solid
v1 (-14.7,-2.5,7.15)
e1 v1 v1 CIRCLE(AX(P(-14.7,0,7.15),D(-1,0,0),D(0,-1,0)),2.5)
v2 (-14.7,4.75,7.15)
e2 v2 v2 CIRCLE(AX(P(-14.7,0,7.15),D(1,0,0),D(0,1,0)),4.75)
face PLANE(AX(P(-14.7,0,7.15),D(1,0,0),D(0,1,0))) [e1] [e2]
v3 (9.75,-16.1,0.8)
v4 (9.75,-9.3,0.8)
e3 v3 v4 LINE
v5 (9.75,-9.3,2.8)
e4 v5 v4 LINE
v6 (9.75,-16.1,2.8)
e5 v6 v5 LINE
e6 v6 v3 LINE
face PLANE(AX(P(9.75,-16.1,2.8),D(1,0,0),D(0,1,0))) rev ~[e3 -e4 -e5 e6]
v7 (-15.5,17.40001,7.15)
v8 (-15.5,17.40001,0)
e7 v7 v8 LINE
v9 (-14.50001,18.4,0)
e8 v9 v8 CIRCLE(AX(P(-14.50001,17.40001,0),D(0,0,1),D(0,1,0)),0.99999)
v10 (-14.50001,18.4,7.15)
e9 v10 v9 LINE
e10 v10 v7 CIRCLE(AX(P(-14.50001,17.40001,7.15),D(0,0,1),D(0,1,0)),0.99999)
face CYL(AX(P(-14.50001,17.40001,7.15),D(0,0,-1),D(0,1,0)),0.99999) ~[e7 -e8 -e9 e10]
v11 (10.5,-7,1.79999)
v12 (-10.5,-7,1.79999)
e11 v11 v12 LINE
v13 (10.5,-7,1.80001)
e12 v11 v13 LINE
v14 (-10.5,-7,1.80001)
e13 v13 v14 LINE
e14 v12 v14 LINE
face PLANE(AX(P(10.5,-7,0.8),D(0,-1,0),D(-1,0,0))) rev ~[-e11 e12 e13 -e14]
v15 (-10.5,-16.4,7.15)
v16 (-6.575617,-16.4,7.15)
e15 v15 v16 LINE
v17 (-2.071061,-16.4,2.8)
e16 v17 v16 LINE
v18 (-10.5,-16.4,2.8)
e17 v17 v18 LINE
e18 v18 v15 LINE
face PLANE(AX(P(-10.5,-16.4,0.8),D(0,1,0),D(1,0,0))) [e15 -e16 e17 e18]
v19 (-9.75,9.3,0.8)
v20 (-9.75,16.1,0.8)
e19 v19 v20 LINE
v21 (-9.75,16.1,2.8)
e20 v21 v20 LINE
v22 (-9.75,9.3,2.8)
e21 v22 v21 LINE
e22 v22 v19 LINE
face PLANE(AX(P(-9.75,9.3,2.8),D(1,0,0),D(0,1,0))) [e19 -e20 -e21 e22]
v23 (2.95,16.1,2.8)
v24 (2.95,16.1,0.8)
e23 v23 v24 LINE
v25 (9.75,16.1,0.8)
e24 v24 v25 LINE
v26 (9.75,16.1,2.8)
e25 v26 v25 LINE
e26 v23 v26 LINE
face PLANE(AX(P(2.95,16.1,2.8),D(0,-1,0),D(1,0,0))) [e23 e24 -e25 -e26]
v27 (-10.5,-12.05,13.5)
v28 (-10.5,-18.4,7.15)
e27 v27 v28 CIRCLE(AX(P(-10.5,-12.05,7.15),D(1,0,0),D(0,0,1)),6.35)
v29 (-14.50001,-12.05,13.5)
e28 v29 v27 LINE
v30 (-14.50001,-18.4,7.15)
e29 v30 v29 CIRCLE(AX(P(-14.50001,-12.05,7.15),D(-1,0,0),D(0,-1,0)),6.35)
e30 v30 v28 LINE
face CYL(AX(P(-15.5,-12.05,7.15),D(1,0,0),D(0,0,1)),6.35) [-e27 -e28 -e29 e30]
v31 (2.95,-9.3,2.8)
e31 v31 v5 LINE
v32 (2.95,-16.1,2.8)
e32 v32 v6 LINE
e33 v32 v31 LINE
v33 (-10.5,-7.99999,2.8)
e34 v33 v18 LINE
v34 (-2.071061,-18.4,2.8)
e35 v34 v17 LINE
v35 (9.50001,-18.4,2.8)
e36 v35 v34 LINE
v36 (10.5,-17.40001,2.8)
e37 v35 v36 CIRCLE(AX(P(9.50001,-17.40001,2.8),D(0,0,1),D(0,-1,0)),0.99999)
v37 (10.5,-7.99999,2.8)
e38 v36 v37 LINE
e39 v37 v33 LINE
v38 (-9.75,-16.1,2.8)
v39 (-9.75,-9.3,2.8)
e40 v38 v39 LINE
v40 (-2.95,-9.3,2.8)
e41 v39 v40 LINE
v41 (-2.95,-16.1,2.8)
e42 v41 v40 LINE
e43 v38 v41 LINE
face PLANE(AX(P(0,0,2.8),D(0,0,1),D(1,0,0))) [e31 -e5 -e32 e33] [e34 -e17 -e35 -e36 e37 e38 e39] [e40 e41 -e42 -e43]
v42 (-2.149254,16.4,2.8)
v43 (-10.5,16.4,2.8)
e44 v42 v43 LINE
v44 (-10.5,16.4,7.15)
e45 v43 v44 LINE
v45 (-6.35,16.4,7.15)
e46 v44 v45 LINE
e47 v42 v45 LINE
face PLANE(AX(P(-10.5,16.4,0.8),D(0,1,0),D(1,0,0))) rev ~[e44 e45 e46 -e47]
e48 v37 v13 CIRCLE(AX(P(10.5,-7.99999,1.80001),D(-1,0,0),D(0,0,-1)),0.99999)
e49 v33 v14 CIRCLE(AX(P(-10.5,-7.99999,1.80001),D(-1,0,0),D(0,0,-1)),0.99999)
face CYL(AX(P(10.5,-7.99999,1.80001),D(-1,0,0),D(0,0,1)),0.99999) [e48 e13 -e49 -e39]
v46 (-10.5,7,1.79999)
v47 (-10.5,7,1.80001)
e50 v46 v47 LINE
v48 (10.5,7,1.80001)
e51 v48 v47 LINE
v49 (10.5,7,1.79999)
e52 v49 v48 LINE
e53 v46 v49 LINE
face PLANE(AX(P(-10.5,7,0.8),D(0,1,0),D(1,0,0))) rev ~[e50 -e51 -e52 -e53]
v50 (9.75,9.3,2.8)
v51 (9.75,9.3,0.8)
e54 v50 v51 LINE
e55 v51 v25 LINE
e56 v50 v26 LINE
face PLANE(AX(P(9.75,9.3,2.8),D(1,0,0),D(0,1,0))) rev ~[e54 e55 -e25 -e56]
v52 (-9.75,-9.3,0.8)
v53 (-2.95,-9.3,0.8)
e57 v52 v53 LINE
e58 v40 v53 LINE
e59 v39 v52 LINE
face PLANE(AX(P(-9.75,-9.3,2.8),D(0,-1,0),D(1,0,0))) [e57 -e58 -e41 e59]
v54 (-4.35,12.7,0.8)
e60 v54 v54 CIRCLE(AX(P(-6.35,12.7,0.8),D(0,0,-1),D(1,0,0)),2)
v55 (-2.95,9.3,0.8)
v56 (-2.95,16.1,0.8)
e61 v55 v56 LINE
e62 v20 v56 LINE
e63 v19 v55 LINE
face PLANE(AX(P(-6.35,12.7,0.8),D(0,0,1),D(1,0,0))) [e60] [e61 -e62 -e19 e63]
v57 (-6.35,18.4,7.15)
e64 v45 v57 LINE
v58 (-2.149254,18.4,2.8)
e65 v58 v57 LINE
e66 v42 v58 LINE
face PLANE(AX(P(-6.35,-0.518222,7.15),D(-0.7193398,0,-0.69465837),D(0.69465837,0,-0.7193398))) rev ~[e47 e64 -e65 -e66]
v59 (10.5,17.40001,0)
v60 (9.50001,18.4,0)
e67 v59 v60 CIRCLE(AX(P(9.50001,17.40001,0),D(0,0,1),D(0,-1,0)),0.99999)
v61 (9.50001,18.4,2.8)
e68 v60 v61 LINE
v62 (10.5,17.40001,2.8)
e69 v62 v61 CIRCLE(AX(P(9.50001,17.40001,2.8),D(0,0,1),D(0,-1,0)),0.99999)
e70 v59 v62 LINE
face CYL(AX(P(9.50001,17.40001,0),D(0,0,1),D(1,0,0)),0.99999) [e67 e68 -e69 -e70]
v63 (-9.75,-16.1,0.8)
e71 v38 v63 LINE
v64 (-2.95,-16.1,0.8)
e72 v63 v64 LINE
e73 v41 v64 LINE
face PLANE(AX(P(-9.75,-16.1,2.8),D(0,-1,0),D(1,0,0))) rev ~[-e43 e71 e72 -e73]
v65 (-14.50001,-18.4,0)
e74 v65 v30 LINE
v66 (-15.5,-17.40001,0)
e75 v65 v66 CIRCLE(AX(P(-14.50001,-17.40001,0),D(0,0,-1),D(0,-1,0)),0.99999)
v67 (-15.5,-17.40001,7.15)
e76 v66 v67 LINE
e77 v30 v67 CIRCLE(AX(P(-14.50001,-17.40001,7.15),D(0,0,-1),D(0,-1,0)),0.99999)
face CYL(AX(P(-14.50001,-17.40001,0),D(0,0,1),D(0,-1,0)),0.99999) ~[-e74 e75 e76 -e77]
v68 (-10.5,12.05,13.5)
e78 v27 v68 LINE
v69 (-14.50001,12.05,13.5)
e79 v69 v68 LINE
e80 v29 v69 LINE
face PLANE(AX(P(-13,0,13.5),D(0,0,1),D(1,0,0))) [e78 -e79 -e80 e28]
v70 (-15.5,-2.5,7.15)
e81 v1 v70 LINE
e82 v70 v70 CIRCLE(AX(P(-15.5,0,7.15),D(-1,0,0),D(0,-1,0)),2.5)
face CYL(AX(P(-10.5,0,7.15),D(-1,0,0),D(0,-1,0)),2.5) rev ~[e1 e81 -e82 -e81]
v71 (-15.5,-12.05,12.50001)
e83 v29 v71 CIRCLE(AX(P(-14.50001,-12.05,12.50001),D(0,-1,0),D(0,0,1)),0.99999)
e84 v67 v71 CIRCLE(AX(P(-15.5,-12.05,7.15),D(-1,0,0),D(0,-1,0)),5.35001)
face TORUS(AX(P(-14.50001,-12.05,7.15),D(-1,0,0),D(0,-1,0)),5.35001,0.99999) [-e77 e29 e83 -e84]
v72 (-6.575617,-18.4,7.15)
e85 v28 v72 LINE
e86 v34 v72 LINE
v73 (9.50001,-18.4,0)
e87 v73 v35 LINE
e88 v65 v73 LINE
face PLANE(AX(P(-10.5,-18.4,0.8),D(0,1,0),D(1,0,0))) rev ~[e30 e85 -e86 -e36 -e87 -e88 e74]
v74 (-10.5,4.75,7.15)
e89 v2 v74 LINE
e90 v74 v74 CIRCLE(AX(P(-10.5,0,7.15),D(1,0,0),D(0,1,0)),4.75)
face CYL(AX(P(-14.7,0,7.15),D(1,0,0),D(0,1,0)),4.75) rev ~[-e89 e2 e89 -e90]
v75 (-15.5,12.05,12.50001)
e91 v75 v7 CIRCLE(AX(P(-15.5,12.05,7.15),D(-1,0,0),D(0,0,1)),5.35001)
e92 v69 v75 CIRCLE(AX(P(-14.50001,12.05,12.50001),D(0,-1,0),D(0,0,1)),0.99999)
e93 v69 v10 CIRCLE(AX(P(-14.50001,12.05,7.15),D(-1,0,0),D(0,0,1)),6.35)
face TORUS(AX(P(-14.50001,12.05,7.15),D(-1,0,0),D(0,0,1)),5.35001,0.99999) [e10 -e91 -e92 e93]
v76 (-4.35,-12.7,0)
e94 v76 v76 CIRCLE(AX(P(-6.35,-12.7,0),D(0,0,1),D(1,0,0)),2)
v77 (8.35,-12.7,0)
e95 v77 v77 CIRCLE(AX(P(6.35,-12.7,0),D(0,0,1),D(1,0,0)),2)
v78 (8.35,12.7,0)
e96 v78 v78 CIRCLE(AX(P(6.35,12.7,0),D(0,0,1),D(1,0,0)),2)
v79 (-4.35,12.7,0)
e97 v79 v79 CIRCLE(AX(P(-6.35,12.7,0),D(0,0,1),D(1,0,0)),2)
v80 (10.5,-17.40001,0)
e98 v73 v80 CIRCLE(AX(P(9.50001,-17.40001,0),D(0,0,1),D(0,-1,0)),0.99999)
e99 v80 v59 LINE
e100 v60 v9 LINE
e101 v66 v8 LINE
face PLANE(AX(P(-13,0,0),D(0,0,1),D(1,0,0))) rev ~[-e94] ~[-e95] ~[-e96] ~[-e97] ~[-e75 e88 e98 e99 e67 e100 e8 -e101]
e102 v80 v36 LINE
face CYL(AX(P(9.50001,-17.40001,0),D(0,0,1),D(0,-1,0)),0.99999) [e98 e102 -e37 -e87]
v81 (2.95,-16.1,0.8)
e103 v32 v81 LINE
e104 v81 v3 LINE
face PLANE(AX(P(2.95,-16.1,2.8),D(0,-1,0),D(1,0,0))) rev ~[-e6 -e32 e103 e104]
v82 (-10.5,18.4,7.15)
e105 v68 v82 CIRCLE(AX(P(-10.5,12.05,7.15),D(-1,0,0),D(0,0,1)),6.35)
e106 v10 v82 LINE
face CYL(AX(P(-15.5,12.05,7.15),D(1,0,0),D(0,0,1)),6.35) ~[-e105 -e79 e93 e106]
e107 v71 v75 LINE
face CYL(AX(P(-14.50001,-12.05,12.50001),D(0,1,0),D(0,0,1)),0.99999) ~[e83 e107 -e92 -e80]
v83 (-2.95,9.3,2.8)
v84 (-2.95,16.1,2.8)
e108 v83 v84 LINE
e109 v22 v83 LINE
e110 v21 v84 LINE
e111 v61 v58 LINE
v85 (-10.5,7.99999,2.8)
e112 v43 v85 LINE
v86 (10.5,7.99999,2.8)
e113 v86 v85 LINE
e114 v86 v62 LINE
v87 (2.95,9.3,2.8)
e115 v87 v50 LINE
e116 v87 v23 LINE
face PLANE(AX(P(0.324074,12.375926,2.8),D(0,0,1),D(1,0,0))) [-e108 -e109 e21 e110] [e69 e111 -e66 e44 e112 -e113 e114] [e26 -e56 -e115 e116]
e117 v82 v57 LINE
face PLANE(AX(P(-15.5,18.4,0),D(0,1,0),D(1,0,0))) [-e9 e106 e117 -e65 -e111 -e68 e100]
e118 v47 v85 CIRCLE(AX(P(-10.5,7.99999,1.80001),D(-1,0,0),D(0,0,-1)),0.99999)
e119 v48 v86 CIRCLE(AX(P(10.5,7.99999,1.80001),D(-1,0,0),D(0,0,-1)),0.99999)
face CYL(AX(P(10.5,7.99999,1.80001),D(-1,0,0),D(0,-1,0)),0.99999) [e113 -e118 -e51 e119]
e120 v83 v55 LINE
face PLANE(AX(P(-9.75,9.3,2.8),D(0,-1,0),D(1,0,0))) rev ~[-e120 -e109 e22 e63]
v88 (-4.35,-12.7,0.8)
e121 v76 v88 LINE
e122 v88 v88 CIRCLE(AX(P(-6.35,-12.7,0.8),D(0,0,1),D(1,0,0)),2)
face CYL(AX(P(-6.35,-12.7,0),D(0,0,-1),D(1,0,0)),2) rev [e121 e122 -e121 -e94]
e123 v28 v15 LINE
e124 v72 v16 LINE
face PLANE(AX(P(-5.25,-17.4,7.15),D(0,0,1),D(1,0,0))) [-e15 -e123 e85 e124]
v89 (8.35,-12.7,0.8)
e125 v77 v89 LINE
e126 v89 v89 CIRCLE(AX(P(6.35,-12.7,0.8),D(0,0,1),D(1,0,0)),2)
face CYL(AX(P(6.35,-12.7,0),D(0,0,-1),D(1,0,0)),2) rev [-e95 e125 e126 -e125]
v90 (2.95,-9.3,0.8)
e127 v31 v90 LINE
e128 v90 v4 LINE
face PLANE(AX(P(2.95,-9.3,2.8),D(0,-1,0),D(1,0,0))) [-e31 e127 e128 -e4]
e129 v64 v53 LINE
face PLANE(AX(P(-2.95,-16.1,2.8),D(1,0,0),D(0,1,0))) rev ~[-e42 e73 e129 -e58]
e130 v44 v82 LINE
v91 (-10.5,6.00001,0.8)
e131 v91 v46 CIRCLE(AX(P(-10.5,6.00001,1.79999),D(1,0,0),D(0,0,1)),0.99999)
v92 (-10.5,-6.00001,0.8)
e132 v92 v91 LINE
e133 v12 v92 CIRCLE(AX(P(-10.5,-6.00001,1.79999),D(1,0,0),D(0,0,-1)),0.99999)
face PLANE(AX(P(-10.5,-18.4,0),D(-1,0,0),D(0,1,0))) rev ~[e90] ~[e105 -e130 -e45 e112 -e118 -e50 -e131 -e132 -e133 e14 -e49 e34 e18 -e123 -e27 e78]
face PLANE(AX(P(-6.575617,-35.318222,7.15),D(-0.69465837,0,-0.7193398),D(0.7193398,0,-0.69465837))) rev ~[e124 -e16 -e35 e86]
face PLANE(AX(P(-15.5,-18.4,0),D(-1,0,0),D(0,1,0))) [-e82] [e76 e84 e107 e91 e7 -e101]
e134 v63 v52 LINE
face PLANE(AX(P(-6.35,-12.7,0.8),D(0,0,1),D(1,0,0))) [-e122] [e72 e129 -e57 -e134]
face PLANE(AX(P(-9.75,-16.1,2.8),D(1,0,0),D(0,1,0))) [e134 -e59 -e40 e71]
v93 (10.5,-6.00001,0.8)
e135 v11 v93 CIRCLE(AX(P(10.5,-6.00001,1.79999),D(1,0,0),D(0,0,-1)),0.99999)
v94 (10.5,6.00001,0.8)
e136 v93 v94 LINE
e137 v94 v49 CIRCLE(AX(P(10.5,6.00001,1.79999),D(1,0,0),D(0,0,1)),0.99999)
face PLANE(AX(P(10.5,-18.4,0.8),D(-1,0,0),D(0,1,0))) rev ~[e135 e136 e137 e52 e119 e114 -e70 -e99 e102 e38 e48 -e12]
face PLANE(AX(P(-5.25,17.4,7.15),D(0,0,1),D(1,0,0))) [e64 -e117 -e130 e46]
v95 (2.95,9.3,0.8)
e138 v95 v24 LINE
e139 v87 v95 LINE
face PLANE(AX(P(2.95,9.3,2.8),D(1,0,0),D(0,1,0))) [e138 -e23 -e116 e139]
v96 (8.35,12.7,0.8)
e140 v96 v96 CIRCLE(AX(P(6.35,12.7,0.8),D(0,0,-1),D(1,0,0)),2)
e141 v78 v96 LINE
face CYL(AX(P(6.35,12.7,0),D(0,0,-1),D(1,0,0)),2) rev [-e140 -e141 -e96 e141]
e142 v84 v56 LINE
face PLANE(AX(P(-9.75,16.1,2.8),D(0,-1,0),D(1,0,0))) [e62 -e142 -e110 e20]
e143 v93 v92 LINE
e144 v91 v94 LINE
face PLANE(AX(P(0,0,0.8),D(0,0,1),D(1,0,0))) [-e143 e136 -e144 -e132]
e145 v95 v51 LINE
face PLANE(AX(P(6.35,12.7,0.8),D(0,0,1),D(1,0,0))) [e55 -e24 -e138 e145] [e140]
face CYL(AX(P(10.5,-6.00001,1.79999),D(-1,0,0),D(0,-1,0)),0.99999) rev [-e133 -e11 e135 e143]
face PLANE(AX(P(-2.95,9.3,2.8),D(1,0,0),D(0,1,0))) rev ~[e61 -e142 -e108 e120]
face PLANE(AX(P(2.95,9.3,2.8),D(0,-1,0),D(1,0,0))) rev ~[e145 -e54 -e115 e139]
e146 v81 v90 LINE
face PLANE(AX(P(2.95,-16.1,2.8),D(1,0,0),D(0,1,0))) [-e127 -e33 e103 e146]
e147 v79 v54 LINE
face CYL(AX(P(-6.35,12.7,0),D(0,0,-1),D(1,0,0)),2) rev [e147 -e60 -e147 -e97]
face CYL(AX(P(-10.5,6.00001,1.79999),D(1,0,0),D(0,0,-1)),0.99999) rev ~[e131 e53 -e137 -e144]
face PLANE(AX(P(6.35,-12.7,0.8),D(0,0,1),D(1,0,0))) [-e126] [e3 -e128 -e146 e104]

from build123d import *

# Parameters (mm, degrees)
F0_W           = 21
F0_H           = 36.8
F0_R           = 2
F1_DEPTH       = 0.8
F0_W_2         = 5
F2_DEPTH       = 13.5
F5_R           = 6.35
F6_D           = 5
F6_CBORE_D     = 9.5
F6_CBORE_DEPTH = 4.2
F7_W           = 10.5
F7_H           = 2
F7_R           = 2
F8_DEPTH       = 2
F9_DEPTH       = 6.35
F10_T4_DEPTH   = 35.8364431643
F10_T9_DEPTH   = 35.8364431643
F11_W          = 6.8
F11_H          = 6.8
F12_DEPTH      = 2
F13_R          = 0.99999


# Not quite as in the source:
# - a fillet or chamfer that OpenCascade refuses, or shapes differently, is made with other operations: its cross-section is extruded or revolved along the edge and cut away or added
# - a fillet or chamfer is up to 0.001 mm smaller than in the source, because OpenCascade refuses the exact size


with BuildPart() as f1:
    # F0 (on Top) → F1 (new body)
    with BuildSketch(Plane.XY):
        Rectangle(F0_W, F0_H)
        with Locations((-6.35, -12.7)):
            Circle(F0_R, mode=Mode.SUBTRACT)
        with Locations((6.35, -12.7)):
            Circle(F0_R, mode=Mode.SUBTRACT)
        with Locations((-6.35, 12.7)):
            Circle(F0_R, mode=Mode.SUBTRACT)
        with Locations((6.35, 12.7)):
            Circle(F0_R, mode=Mode.SUBTRACT)
    extrude(amount=F1_DEPTH)

    # F0 (on Top) → F2 (join)
    with BuildSketch(Plane.XY):
        with Locations((-13, 0)):
            Rectangle(F0_W_2, F0_H)
    extrude(amount=F2_DEPTH)

    # F5
    f5_edges = [f1.edges().sort_by_distance(p)[0] for p in [
        (-13, -18.4, 13.5),
        (-13, 18.4, 13.5),
    ]]
    fillet(f5_edges, radius=F5_R)

    # F6 (through all)
    with Locations(Plane.YZ.offset(-10.5)):
        with Locations((0, 7.15)):
            CounterBoreHole(F6_D / 2, F6_CBORE_D / 2, F6_CBORE_DEPTH)

    # F7 (on face) → F8 (join)
    with BuildSketch(Plane.XY.offset(0.8)):
        with Locations((-5.25, -17.4)):
            Rectangle(F7_W, F7_H)
        Polygon((-10.5, -16.4), (0, -16.4), (0, -18.4), (10.5, -18.4), (10.5, -7), (-10.5, -7), align=None)
        Polygon((-10.5, 16.4), (-10.5, 7), (10.5, 7), (10.5, 18.4), (0, 18.4), (0, 16.4), align=None)
        with Locations((-6.35, 12.7)):
            Circle(F7_R, mode=Mode.SUBTRACT)
        with Locations((6.35, 12.7)):
            Circle(F7_R, mode=Mode.SUBTRACT)
    extrude(amount=F8_DEPTH)

    # F7 (on face) → F9 (join)
    with BuildSketch(Plane.XY.offset(0.8)):
        with Locations((-5.25, -17.4)):
            Rectangle(F7_W, F7_H)
        with Locations((-5.25, 17.4)):
            Rectangle(F7_W, F7_H)
    extrude(amount=F9_DEPTH)

    # F10: chamfer of 6.35 x 6.5756174926 on 2 edges, made by hand


with BuildPart() as f10_tool2:
    # F10_s3 → F10_t4 (new body)
    with BuildSketch(Plane.XZ.offset(35.3182215821)):
        Polygon((-6.5756174926, 7.15), (0, 0.8), (0, 7.15), align=None)
    extrude(amount=-F10_T4_DEPTH)

    split(bisect_by=Plane.XY.offset(2.8), keep=Keep.TOP)


with BuildPart() as f1_1:
    add(f1.part)

    # F10_t1: cut F10_tool2
    add(f10_tool2.part, mode=Mode.SUBTRACT)


with BuildPart() as f10_tool7:
    # F10_s8 → F10_t9 (new body)
    with BuildSketch(Plane.XZ.offset(0.5182215821)):
        Polygon((-6.35, 7.15), (0, 0.5743825074), (0, 7.15), align=None)
    extrude(amount=-F10_T9_DEPTH)

    split(bisect_by=Plane.XY.offset(2.8), keep=Keep.TOP)


with BuildPart() as f1_2:
    add(f1_1.part)

    # F10_t6: cut F10_tool7
    add(f10_tool7.part, mode=Mode.SUBTRACT)

    # F11 (on face) → F12 (cut)
    with BuildSketch(Plane.XY.offset(2.8)):
        with Locations((-6.35, -12.7)):
            Rectangle(F11_W, F11_H)
        with Locations((6.35, -12.7)):
            Rectangle(F11_W, F11_H)
        with Locations((-6.35, 12.7)):
            Rectangle(F11_W, F11_H)
        with Locations((6.35, 12.7)):
            Rectangle(F11_W, F11_H)
    extrude(amount=-F12_DEPTH, mode=Mode.SUBTRACT)

    # F13 (radius 1 in the source; OpenCascade refuses exactly that, so slightly less here)
    f13_edges = [f1_2.edges().sort_by_distance(p)[0] for p in [
        (10.5, -18.4, 1.4),
        (10.5, 18.4, 1.4),
        (-15.5, -18.4, 3.575),
        (0, 7, 0.8),
        (0, -7, 0.8),
        (0, 7, 2.8),
        (0, -7, 2.8),
        (-15.5, 0, 13.5),
        (-15.5, -16.540128, 11.640128),
        (-15.5, 16.540128, 11.640128),
        (-15.5, 18.4, 3.575),
    ]]
    fillet(f13_edges, radius=F13_R)


solid = f1_2.part
